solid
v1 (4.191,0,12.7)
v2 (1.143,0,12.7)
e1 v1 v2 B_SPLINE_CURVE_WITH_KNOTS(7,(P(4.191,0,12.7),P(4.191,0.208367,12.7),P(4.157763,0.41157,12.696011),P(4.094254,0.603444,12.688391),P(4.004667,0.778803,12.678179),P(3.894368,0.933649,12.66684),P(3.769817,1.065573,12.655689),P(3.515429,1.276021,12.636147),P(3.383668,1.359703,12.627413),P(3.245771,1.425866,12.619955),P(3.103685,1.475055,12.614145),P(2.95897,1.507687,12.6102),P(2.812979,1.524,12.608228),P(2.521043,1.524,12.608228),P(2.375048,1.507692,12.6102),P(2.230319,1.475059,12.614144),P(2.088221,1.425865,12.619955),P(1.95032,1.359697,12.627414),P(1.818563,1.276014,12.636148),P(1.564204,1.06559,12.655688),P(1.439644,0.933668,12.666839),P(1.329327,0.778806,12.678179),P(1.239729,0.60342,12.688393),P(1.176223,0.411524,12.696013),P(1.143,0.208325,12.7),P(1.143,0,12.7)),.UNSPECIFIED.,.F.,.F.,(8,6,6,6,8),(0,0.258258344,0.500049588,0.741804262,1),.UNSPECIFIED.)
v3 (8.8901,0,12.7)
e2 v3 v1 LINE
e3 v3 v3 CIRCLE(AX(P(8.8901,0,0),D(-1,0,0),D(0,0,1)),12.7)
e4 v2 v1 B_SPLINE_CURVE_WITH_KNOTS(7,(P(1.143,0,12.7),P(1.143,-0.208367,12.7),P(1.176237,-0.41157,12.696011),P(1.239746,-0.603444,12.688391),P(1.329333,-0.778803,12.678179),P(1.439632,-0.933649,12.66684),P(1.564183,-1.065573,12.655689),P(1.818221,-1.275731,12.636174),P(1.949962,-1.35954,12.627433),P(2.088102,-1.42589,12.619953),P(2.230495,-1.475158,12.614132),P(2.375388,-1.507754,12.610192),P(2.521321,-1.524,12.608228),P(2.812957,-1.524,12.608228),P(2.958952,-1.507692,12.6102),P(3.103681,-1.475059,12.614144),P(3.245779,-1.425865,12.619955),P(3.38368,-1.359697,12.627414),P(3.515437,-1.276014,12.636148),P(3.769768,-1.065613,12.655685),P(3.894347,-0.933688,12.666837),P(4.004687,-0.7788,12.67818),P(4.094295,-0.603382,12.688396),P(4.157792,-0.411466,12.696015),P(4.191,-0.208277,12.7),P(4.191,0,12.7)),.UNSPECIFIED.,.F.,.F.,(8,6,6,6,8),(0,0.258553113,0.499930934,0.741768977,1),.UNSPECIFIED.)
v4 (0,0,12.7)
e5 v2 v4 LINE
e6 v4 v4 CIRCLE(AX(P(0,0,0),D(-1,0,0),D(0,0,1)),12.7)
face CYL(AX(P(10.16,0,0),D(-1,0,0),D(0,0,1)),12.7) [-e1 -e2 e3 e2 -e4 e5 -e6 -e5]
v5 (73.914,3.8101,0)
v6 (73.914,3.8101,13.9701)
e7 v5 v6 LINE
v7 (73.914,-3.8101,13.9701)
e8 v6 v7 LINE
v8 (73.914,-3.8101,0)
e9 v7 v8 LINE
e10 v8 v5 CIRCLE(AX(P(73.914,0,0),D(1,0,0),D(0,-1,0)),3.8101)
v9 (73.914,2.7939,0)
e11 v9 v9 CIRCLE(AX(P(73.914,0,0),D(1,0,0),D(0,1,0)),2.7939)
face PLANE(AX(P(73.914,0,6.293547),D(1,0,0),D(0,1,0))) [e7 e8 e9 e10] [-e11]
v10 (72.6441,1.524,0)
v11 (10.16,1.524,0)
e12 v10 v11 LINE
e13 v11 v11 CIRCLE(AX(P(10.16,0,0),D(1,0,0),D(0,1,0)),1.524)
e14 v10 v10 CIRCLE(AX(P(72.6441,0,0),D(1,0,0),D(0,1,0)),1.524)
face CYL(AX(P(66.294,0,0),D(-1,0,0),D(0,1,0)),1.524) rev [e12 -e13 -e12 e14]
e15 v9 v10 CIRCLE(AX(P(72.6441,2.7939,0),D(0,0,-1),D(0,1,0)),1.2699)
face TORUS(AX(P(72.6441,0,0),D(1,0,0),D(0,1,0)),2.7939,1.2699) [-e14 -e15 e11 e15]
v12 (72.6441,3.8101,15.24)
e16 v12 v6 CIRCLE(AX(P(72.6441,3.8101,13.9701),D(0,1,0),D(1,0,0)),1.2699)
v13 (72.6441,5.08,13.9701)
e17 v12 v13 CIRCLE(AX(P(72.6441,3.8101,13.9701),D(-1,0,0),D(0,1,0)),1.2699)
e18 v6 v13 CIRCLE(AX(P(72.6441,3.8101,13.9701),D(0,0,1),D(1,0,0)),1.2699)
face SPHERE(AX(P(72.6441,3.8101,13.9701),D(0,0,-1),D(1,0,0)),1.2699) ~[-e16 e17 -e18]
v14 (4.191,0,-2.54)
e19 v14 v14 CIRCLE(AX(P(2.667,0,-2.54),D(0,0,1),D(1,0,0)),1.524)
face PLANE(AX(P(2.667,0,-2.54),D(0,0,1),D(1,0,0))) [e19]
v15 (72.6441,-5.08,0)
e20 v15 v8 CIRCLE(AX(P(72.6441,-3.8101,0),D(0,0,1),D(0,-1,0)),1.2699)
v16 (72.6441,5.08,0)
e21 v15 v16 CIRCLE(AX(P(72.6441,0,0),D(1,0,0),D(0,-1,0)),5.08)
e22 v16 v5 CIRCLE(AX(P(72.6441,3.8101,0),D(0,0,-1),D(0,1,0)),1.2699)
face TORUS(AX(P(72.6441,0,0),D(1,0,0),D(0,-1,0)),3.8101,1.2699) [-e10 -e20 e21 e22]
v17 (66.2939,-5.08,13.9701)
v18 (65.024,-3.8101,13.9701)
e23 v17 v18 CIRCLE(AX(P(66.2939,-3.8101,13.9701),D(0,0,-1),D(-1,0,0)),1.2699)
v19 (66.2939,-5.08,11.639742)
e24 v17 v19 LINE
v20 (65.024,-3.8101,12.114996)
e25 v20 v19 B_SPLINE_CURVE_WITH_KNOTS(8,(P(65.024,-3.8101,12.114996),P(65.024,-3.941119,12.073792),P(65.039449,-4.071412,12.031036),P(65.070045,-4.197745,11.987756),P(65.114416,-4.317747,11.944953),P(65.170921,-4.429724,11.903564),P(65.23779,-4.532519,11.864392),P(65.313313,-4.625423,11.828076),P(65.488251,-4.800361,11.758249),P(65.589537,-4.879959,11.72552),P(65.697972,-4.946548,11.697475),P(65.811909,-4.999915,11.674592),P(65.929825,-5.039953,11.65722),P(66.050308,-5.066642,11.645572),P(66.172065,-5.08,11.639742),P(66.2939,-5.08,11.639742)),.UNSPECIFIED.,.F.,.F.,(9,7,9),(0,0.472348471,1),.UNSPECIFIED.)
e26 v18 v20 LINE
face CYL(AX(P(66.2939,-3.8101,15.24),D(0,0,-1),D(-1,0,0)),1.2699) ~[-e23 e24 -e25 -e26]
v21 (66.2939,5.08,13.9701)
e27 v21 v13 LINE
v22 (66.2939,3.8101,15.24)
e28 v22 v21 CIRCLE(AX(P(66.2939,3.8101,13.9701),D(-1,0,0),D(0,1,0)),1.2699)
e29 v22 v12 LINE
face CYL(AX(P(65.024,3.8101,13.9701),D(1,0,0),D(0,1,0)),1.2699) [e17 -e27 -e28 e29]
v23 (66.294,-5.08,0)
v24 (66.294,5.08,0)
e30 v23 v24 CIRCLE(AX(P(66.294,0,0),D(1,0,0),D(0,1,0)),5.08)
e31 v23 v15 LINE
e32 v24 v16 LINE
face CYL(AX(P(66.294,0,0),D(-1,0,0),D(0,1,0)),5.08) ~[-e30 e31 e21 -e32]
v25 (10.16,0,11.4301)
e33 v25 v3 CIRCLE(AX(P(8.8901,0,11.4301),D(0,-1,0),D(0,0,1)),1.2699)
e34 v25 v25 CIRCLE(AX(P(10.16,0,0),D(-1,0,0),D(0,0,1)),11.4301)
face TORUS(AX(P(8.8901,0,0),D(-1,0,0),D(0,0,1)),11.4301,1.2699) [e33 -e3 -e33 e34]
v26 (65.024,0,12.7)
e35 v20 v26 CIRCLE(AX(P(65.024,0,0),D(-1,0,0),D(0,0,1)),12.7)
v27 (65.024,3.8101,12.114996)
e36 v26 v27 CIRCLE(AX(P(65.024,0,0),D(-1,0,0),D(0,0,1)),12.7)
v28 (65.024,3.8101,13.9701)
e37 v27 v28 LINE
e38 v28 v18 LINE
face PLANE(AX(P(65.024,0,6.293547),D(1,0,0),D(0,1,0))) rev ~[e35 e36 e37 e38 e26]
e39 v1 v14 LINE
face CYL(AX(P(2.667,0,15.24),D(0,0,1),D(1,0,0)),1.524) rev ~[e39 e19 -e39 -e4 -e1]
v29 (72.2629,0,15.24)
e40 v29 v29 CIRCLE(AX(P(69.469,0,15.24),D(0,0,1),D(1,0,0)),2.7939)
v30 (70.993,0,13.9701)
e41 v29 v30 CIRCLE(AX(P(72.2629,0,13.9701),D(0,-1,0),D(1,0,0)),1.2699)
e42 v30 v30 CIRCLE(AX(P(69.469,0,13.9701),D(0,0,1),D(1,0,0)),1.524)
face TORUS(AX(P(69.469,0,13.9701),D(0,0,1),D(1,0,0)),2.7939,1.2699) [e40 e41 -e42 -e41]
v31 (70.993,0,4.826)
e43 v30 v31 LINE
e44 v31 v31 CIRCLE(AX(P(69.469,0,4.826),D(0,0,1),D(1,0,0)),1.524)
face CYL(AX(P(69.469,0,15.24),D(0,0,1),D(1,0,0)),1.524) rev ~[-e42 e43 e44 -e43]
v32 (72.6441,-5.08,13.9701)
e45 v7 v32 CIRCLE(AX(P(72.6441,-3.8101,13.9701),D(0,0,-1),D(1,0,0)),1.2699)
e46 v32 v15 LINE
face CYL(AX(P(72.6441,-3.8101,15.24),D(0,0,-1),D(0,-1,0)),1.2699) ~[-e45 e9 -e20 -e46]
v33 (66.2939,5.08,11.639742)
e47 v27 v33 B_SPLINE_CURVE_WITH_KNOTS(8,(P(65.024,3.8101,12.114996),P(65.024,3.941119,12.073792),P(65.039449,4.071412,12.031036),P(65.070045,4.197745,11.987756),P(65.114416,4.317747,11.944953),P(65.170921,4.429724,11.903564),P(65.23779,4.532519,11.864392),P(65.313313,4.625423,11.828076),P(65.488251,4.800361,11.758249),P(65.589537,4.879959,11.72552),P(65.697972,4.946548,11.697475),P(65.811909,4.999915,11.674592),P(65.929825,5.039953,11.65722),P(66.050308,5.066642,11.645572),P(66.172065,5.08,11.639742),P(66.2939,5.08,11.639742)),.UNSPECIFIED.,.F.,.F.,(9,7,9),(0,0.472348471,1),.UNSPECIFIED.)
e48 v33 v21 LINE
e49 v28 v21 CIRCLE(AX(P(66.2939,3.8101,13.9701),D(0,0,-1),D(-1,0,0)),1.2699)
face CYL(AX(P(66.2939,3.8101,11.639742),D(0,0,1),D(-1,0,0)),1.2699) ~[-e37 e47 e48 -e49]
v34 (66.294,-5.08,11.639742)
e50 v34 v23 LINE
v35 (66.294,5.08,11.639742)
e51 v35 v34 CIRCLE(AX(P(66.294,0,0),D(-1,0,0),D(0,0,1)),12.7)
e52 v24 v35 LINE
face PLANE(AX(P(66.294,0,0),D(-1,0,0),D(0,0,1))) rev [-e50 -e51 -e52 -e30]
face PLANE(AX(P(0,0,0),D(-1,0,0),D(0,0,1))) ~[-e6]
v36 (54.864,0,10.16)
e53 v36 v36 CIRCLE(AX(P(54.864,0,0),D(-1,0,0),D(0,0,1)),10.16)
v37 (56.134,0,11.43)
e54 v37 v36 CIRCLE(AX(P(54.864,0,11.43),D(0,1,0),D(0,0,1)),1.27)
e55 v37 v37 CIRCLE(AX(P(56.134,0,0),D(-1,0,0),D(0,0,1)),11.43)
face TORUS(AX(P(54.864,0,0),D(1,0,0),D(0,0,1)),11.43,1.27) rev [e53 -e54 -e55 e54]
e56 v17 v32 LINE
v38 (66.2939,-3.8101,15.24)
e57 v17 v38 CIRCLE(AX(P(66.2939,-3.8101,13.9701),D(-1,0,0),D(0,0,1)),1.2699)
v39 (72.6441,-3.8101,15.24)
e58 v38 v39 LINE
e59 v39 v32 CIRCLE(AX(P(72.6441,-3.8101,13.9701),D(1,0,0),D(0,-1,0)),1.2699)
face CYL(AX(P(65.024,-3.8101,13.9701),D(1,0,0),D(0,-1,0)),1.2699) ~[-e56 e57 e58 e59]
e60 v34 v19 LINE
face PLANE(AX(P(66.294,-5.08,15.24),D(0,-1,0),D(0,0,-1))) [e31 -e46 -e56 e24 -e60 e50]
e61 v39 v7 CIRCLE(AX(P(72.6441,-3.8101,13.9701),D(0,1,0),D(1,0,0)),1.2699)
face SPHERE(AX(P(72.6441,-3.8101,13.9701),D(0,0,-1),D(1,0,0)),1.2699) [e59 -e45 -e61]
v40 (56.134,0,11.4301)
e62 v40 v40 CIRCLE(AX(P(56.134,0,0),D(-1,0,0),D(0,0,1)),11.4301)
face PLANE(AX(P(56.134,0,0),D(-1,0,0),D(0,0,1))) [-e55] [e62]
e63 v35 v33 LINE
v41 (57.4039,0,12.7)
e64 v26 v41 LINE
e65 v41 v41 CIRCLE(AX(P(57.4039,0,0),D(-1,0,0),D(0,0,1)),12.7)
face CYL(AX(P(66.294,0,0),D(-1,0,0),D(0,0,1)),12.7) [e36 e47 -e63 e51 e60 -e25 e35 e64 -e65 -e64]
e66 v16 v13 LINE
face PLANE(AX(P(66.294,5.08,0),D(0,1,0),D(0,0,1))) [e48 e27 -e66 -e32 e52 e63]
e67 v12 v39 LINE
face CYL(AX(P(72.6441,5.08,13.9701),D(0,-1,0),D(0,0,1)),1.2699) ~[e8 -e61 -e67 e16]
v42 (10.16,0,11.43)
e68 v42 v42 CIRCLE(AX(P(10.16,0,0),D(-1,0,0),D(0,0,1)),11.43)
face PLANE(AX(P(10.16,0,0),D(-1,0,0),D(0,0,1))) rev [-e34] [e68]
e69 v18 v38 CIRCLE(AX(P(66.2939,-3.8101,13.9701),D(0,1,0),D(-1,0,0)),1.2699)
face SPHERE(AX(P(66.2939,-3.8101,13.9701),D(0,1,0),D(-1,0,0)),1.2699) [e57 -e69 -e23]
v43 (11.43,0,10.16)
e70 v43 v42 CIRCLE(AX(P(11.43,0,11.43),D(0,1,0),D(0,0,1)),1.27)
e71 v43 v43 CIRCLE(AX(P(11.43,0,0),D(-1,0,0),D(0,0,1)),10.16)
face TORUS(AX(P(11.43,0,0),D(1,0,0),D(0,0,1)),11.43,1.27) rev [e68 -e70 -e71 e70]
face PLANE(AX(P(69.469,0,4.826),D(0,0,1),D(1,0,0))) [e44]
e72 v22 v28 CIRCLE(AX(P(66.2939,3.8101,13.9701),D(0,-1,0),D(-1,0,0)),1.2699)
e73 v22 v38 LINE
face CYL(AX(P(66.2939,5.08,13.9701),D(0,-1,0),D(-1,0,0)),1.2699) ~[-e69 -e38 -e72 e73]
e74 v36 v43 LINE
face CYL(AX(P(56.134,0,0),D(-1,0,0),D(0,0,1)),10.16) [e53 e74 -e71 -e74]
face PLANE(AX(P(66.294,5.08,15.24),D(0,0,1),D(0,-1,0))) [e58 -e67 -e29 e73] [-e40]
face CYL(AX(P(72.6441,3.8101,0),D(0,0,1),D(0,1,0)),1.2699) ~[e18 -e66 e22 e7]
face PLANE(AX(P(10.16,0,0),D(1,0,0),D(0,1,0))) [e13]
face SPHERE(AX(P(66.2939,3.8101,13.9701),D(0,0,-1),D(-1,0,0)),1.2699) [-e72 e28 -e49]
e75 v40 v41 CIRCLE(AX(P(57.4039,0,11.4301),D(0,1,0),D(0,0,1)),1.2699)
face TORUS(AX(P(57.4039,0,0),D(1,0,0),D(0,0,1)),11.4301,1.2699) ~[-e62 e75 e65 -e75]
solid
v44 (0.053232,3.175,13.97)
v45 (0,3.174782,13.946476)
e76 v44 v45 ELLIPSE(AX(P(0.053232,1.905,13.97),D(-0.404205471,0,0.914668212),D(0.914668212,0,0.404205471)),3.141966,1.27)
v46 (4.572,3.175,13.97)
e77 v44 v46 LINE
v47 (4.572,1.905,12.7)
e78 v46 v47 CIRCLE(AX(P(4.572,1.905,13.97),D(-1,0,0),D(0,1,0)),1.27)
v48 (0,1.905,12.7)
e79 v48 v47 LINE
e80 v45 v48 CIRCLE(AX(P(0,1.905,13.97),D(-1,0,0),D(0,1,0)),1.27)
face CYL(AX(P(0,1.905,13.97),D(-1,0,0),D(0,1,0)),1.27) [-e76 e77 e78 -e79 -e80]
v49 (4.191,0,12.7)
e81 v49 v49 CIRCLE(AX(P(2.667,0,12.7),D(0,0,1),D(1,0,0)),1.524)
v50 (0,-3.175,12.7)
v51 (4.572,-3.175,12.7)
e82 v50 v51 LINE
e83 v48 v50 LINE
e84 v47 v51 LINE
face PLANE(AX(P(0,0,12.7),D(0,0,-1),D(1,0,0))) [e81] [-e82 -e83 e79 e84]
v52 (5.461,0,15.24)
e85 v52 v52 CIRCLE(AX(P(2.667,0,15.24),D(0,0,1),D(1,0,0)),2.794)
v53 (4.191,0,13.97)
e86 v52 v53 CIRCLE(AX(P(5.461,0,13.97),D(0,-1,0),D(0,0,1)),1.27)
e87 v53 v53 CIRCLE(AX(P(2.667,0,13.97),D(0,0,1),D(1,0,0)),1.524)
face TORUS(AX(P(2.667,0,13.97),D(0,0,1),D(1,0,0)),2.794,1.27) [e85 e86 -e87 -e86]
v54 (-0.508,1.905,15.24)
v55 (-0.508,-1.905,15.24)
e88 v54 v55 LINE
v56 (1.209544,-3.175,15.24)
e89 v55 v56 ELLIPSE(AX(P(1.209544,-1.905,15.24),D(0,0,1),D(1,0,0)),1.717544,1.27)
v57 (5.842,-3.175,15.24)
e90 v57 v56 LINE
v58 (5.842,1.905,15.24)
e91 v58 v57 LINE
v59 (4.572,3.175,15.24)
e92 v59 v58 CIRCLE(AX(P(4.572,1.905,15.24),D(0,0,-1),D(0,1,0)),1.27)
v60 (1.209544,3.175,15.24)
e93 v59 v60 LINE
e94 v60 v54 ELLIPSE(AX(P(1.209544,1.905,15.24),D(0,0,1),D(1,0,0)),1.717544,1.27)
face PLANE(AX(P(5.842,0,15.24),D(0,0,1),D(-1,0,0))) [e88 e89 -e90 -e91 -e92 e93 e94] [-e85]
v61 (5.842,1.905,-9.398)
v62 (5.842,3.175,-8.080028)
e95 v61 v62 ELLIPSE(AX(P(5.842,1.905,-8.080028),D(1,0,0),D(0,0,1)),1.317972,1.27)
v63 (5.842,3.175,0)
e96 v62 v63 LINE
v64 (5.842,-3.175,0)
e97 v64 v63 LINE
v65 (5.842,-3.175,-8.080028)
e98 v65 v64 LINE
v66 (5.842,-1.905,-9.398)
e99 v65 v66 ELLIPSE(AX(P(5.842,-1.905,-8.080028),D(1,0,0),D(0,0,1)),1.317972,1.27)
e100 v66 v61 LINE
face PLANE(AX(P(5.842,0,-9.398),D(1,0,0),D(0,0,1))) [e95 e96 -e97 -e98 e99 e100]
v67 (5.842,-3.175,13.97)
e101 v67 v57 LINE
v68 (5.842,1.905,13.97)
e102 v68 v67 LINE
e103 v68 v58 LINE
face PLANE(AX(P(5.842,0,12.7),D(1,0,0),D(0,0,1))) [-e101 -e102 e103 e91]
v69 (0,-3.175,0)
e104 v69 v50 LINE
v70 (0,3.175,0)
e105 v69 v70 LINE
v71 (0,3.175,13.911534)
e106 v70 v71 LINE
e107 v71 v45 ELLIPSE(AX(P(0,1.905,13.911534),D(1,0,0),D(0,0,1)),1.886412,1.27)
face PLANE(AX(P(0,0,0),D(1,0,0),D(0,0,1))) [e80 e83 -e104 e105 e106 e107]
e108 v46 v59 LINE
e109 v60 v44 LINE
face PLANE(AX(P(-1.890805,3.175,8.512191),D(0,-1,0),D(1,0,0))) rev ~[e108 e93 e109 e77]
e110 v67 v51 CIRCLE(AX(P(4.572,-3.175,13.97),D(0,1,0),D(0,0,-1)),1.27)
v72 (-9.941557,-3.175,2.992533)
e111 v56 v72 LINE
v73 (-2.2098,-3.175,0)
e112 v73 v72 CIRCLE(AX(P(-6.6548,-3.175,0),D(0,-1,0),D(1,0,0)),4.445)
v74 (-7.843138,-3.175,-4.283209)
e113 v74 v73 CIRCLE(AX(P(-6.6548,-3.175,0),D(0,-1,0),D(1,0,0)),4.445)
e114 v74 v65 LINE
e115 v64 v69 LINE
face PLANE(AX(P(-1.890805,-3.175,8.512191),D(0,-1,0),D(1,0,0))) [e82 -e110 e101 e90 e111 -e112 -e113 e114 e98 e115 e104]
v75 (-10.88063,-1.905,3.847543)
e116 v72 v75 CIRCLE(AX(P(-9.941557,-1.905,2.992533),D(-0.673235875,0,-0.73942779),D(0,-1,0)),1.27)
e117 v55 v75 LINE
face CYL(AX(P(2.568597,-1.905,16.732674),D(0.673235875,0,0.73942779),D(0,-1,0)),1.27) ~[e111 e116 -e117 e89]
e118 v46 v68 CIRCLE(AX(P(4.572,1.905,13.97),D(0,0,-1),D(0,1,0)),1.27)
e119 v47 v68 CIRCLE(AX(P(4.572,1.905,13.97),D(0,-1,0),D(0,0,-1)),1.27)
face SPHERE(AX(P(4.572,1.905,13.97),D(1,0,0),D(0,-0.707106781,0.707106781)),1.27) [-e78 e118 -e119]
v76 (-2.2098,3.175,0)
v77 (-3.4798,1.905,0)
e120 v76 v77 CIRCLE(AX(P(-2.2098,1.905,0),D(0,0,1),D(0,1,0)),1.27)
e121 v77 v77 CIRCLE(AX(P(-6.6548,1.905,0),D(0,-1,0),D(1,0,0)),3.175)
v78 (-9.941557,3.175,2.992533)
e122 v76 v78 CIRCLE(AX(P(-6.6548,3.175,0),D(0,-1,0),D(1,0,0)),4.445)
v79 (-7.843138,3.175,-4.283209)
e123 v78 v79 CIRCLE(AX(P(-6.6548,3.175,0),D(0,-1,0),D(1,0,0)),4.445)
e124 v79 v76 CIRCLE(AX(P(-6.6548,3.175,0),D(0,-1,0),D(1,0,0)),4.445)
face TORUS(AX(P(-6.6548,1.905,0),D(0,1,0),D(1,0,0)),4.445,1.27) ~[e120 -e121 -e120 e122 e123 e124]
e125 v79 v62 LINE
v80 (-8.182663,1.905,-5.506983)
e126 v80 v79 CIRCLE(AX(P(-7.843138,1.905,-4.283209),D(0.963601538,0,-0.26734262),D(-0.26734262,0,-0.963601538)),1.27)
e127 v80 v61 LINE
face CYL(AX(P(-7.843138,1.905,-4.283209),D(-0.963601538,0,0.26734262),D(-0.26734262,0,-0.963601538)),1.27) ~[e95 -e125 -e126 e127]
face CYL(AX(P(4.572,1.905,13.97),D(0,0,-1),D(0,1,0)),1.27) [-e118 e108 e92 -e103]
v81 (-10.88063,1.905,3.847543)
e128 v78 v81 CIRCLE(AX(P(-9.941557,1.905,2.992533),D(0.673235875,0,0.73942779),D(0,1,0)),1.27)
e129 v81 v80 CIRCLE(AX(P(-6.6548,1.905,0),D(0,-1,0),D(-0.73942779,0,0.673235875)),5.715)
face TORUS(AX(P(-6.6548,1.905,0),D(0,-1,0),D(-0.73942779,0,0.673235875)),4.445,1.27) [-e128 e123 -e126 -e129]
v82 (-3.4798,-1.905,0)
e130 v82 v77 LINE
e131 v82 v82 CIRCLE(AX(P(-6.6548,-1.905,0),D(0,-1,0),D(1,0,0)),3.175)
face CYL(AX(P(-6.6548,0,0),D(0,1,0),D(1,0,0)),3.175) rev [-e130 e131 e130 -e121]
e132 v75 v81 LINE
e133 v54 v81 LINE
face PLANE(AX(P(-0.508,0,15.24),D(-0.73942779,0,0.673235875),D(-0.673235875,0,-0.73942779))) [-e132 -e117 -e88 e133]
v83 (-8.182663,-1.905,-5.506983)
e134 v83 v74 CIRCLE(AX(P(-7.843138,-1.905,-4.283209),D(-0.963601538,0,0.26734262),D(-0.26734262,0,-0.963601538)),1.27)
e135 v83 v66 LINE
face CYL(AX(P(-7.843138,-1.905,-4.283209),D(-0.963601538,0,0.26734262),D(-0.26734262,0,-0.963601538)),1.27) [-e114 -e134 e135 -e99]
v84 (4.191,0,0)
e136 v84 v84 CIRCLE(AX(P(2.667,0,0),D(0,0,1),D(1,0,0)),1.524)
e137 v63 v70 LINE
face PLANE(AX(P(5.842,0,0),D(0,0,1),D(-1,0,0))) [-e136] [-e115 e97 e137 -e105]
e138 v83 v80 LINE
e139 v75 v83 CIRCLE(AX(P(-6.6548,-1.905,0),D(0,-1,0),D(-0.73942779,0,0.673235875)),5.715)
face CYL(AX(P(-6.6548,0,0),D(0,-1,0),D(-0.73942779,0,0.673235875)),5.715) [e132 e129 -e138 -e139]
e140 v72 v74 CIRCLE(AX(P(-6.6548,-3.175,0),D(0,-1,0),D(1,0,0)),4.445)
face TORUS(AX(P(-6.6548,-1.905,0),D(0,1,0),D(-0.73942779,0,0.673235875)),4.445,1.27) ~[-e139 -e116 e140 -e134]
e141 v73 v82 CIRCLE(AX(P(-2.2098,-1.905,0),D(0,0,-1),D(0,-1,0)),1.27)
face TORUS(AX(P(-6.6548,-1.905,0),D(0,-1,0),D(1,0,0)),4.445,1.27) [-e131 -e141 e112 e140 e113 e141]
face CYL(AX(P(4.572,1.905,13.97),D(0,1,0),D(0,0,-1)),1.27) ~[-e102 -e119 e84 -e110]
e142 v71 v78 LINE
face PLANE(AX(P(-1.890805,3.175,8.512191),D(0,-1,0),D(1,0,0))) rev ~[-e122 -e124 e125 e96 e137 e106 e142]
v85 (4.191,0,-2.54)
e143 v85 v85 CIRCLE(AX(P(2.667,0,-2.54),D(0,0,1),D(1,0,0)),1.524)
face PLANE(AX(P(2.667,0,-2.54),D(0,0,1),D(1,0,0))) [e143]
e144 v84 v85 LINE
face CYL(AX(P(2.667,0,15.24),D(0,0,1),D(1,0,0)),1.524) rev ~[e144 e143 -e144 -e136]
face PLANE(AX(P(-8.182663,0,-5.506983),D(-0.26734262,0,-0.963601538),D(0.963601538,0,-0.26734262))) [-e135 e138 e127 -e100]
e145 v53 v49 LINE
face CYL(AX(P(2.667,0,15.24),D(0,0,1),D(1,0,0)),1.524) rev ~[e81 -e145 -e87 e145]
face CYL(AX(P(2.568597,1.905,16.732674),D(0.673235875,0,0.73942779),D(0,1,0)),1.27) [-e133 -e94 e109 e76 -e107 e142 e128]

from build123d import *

# Parameters (mm, degrees)
F0_W            = 5.842
F0_H            = 12.7
F0_R            = 3.175
F2_DEPTH        = 3.175
F3_R            = 1.524
F4_DEPTH        = 7.62
F4_DEPTH_BACK   = 1.27
F5_DEPTH        = 56.134
F6_R            = 1.524
F7_DEPTH        = 10.414
F8_R            = 1.524
F9_DEPTH        = 17.78
F10_F1_R        = 1.27
F10_F2_R        = 1.2699
F10_2_T1_DEPTH  = 18.5821257943
F10_2_T3_DEPTH  = 4.572
F10_2_T5_DEPTH  = 4.445
F10_2_T7_DEPTH  = 8.255
F10_2_T9_DEPTH  = 17.7294216388
F10_2_S13_W     = 1.27
F10_2_S13_H     = 1.27
F10_2_T14_DEPTH = 1.27
F10_2_T20_ANGLE = 116.8111069241
F10_2_T26_ANGLE = 116.8111069241


# Not quite as in the source:
# - a fillet or chamfer that OpenCascade refuses, or shapes differently, is made with other operations: its cross-section is extruded or revolved along the edge and cut away or added
# - a fillet or chamfer is up to 0.001 mm smaller than in the source, because OpenCascade refuses the exact size


with BuildPart() as f1:
    # F0 (on Front) → F1 (revolve)
    with BuildSketch(Plane.XZ):
        with Locations((2.921, 6.35)):
            Rectangle(F0_W, F0_H)
        Polygon((5.842, 12.7), (5.842, 0), (66.294, 0), (66.294, 12.7), (56.134, 12.7), (56.134, 10.16), (10.16, 10.16), (10.16, 12.7), align=None)
    revolve(axis=Axis((33.147, 0, 0), (-1, 0, 0)))

    # F3 (on face) → F4 (join, two sides)
    with BuildSketch(Plane.YZ.offset(66.294)) as f4_sk:
        with BuildLine():
            ThreePointArc((-5.08, 0), (0, 5.08), (5.08, 0))
            Line((5.08, 0), (5.08, 11.6397422652))
            ThreePointArc((5.08, 11.6397422652), (0, 12.7), (-5.08, 11.6397422652))
            Line((-5.08, 11.6397422652), (-5.08, 0))
        make_face()
        with BuildLine():
            ThreePointArc((-5.08, 0), (0, -5.08), (5.08, 0))
            ThreePointArc((5.08, 0), (0, 5.08), (-5.08, 0))
        make_face()
        Circle(F3_R, mode=Mode.SUBTRACT)
        with BuildLine():
            ThreePointArc((-5.08, 11.6397422652), (0, 12.7), (5.08, 11.6397422652))
            Line((5.08, 11.6397422652), (5.08, 15.24))
            Line((5.08, 15.24), (-5.08, 15.24))
            Line((-5.08, 15.24), (-5.08, 11.6397422652))
        make_face()
    extrude(amount=F4_DEPTH)
    extrude(f4_sk.sketch, amount=-F4_DEPTH_BACK)

    # F3 (on face) → F5 (cut, through all)
    with BuildSketch(Plane.YZ.offset(66.294)):
        Circle(F3_R)
    extrude(amount=-F5_DEPTH, mode=Mode.SUBTRACT)

    # F6 (on face) → F7 (cut)
    with BuildSketch(Plane.XY.offset(15.24)):
        with Locations((69.469, 0)):
            Circle(F6_R)
    extrude(amount=-F7_DEPTH, mode=Mode.SUBTRACT)


with BuildPart() as f2:
    # F0 (on Front) → F2 (new body, symmetric)
    with BuildSketch(Plane.XZ):
        with BuildLine():
            Line((-0.9398, 0), (0, 0))
            Line((0, 0), (0, 12.7))
            Line((0, 12.7), (5.842, 12.7))
            Line((5.842, 12.7), (5.842, 15.24))
            Line((5.842, 15.24), (-0.508, 15.24))
            Line((-0.508, 15.24), (-10.8806298187, 3.8475430269))
            ThreePointArc((-10.8806298187, 3.8475430269), (-4.5919612295, 5.3297205562), (-0.9398, 0))
        make_face()
        with BuildLine():
            Line((5.842, 0), (0, 0))
            Line((0, 0), (-0.9398, 0))
            ThreePointArc((-0.9398, 0), (-3.1957909266, -4.5493385486), (-8.1826630726, -5.5069827884))
            Line((-8.1826630726, -5.5069827884), (5.842, -9.398))
            Line((5.842, -9.398), (5.842, 0))
        make_face()
        with BuildLine():
            ThreePointArc((-8.1826630726, -5.5069827884), (-3.1957909266, -4.5493385486), (-0.9398, 0))
            ThreePointArc((-0.9398, 0), (-4.5919612295, 5.3297205562), (-10.8806298187, 3.8475430269))
            ThreePointArc((-10.8806298187, 3.8475430269), (-12.1459778134, -1.5837270034), (-8.1826630726, -5.5069827884))
        make_face()
        with Locations((-6.6548, 0)):
            Circle(F0_R, mode=Mode.SUBTRACT)
    extrude(amount=F2_DEPTH, both=True)


with BuildPart() as f9_tool:
    # F8 (on face) → F9 (new body)
    with BuildSketch(Plane.XY.offset(15.24)):
        with Locations((2.667, 0)):
            Circle(F8_R)
    extrude(amount=-F9_DEPTH)


with BuildPart() as f1_1:
    add(f1.part)

    # F9: cut by f9_tool
    add(f9_tool.part, mode=Mode.SUBTRACT)

    # F10: fillet of radius 1.27 on 14 edges, made by hand

    # F10_f1
    f10_f1_edges = [f1_1.edges().sort_by_distance(p)[0] for p in [
        (10.16, 0, -10.16),
        (56.134, 0, -10.16),
    ]]
    fillet(f10_f1_edges, radius=F10_F1_R)

    # F10_f2 (radius 1.27 in the source; OpenCascade refuses exactly that, so slightly less here)
    f10_f2_edges = [f1_1.edges().sort_by_distance(p)[0] for p in [
        (73.914, -1.524, 0),
        (73.914, 0, -5.08),
        (65.024, 5.08, 13.4398711326),
        (65.024, 0, 15.24),
        (65.024, -5.08, 13.4398711326),
        (67.945, 0, 15.24),
        (73.914, 0, 15.24),
        (10.16, 0, -12.7),
        (56.134, 0, -12.7),
        (69.469, -5.08, 15.24),
        (69.469, 5.08, 15.24),
        (73.914, -5.08, 7.62),
        (73.914, 5.08, 7.62),
    ]]
    fillet(f10_f2_edges, radius=F10_F2_R)


with BuildPart() as f2_1:
    add(f2.part)

    # F9: cut by f9_tool
    add(f9_tool.part, mode=Mode.SUBTRACT)

    # F10#2: fillet of radius 1.27 on 10 edges, made by hand

    # F10_2_s2 → F10_2_t1 (cut)
    with BuildSketch(Plane(origin=(9.4938886236, 0, 10.4273187748), x_dir=(0, 1, 0), z_dir=(-0.6732358752, 0, -0.7394277898))):
        with BuildLine():
            ThreePointArc((3.175, -9.3657440555), (2.8030256121, -10.2637696676), (1.905, -10.6357440555))
            Line((1.905, -10.6357440555), (3.175, -10.6357440555))
            Line((3.175, -10.6357440555), (3.175, -9.3657440555))
        make_face()
        with BuildLine():
            ThreePointArc((-3.175, -9.3657440555), (-2.8030256121, -10.2637696676), (-1.905, -10.6357440555))
            Line((-1.905, -10.6357440555), (-3.175, -10.6357440555))
            Line((-3.175, -10.6357440555), (-3.175, -9.3657440555))
        make_face()
    extrude(amount=F10_2_T1_DEPTH, mode=Mode.SUBTRACT)

    # F10_2_s4 → F10_2_t3 (cut)
    with BuildSketch(Plane.YZ):
        with BuildLine():
            ThreePointArc((3.175, 13.97), (2.8030256121, 13.0719743879), (1.905, 12.7))
            Line((1.905, 12.7), (3.175, 12.7))
            Line((3.175, 12.7), (3.175, 13.97))
        make_face()
    extrude(amount=F10_2_T3_DEPTH, mode=Mode.SUBTRACT)

    # F10_2_s6 → F10_2_t5 (cut)
    with BuildSketch(Plane.XY.offset(13.97)):
        with BuildLine():
            ThreePointArc((4.572, 3.175), (5.4700256121, 2.8030256121), (5.842, 1.905))
            Line((5.842, 1.905), (5.842, 3.175))
            Line((5.842, 3.175), (4.572, 3.175))
        make_face()
    extrude(amount=F10_2_T5_DEPTH, mode=Mode.SUBTRACT)

    # F10_2_s8 → F10_2_t7 (cut)
    with BuildSketch(Plane.XZ.offset(-1.905)):
        with BuildLine():
            ThreePointArc((4.572, 12.7), (5.4700256121, 13.0719743879), (5.842, 13.97))
            Line((5.842, 13.97), (5.842, 12.7))
            Line((5.842, 12.7), (4.572, 12.7))
        make_face()
    extrude(amount=F10_2_T7_DEPTH, mode=Mode.SUBTRACT)

    # F10_2_s10 → F10_2_t9 (cut)
    with BuildSketch(Plane(origin=(-6.179167626, 0, 1.7143547379), x_dir=(0, 1, 0), z_dir=(0.9636015378, 0, -0.2673426199))):
        with BuildLine():
            ThreePointArc((-1.905, -7.4941116667), (-2.8030256121, -7.1221372788), (-3.175, -6.2241116667))
            Line((-3.175, -6.2241116667), (-3.175, -7.4941116667))
            Line((-3.175, -7.4941116667), (-1.905, -7.4941116667))
        make_face()
        with BuildLine():
            ThreePointArc((1.905, -7.4941116667), (2.8030256121, -7.1221372788), (3.175, -6.2241116667))
            Line((3.175, -6.2241116667), (3.175, -7.4941116667))
            Line((3.175, -7.4941116667), (1.905, -7.4941116667))
        make_face()
    extrude(amount=F10_2_T9_DEPTH, mode=Mode.SUBTRACT)


with BuildPart() as f10_2_tool12:
    # F10_2_s13 → F10_2_t14 (new body)
    with BuildSketch(Plane.YZ.offset(4.572)):
        with Locations((2.54, 13.335)):
            Rectangle(F10_2_S13_W, F10_2_S13_H)
    extrude(amount=F10_2_T14_DEPTH)

    # F10_2_s15 → F10_2_t16 (revolve, cut)
    with BuildSketch(Plane(origin=(4.572, 1.905, 13.97), x_dir=(0, -0.7071067812, 0.7071067812), z_dir=(0, 0.7071067812, 0.7071067812))):
        with BuildLine():
            ThreePointArc((0, -1.27), (1.27, 0), (0, 1.27))
            Line((0, 1.27), (0, -1.27))
        make_face()
    revolve(axis=Axis((4.572, 1.905, 13.97), (1, 0, 0)), mode=Mode.SUBTRACT)


with BuildPart() as f2_2:
    add(f2_1.part)

    # F10_2_t11: cut F10_2_tool12
    add(f10_2_tool12.part, mode=Mode.SUBTRACT)

    # F10_2_s17 → F10_2_t18 (revolve, cut)
    with BuildSketch(Plane.XY):
        with BuildLine():
            ThreePointArc((-2.2098, 3.175), (-3.1078256121, 2.8030256121), (-3.4798, 1.905))
            Line((-3.4798, 1.905), (-3.4798, 3.175))
            Line((-3.4798, 3.175), (-2.2098, 3.175))
        make_face()
    revolve(axis=Axis((-6.6548, 3.175, 0), (0, -1, 0)), mode=Mode.SUBTRACT)

    # F10_2_s19 → F10_2_t20 (revolve, cut)
    with BuildSketch(Plane(origin=(-3.0162650989, 0, -3.3128214309), x_dir=(0, 1, 0), z_dir=(0.6732358752, 0, 0.7394277898))):
        with BuildLine():
            ThreePointArc((3.175, 9.3657440555), (2.8030256121, 10.2637696676), (1.905, 10.6357440555))
            Line((1.905, 10.6357440555), (3.175, 10.6357440555))
            Line((3.175, 10.6357440555), (3.175, 9.3657440555))
        make_face()
    revolve(axis=Axis((-6.6548, 3.175, 0), (0, -1, 0)), revolution_arc=F10_2_T20_ANGLE, mode=Mode.SUBTRACT)

    # F10_2_s21 → F10_2_t22 (revolve, cut)
    with BuildSketch(Plane.XY):
        with BuildLine():
            ThreePointArc((-2.2098, -3.175), (-3.1078256121, -2.8030256121), (-3.4798, -1.905))
            Line((-3.4798, -1.905), (-3.4798, -3.175))
            Line((-3.4798, -3.175), (-2.2098, -3.175))
        make_face()
    revolve(axis=Axis((-6.6548, -3.175, 0), (0, -1, 0)), mode=Mode.SUBTRACT)

    # F10_2_s23 → F10_2_t24 (revolve, cut)
    with BuildSketch(Plane.XZ):
        with BuildLine():
            ThreePointArc((5.461, 15.24), (4.5629743879, 14.8680256121), (4.191, 13.97))
            Line((4.191, 13.97), (4.191, 15.24))
            Line((4.191, 15.24), (5.461, 15.24))
        make_face()
    revolve(axis=Axis((2.667, 0, 15.24), (0, 0, 1)), mode=Mode.SUBTRACT)

    # F10_2_s25 → F10_2_t26 (revolve, cut)
    with BuildSketch(Plane(origin=(-3.0162650989, 0, -3.3128214309), x_dir=(0, 1, 0), z_dir=(0.6732358752, 0, 0.7394277898))):
        with BuildLine():
            ThreePointArc((-3.175, 9.3657440555), (-2.8030256121, 10.2637696676), (-1.905, 10.6357440555))
            Line((-1.905, 10.6357440555), (-3.175, 10.6357440555))
            Line((-3.175, 10.6357440555), (-3.175, 9.3657440555))
        make_face()
    revolve(axis=Axis((-6.6548, -3.175, 0), (0, -1, 0)), revolution_arc=F10_2_T26_ANGLE, mode=Mode.SUBTRACT)


solid = Compound([f1_1.part, f2_2.part])
